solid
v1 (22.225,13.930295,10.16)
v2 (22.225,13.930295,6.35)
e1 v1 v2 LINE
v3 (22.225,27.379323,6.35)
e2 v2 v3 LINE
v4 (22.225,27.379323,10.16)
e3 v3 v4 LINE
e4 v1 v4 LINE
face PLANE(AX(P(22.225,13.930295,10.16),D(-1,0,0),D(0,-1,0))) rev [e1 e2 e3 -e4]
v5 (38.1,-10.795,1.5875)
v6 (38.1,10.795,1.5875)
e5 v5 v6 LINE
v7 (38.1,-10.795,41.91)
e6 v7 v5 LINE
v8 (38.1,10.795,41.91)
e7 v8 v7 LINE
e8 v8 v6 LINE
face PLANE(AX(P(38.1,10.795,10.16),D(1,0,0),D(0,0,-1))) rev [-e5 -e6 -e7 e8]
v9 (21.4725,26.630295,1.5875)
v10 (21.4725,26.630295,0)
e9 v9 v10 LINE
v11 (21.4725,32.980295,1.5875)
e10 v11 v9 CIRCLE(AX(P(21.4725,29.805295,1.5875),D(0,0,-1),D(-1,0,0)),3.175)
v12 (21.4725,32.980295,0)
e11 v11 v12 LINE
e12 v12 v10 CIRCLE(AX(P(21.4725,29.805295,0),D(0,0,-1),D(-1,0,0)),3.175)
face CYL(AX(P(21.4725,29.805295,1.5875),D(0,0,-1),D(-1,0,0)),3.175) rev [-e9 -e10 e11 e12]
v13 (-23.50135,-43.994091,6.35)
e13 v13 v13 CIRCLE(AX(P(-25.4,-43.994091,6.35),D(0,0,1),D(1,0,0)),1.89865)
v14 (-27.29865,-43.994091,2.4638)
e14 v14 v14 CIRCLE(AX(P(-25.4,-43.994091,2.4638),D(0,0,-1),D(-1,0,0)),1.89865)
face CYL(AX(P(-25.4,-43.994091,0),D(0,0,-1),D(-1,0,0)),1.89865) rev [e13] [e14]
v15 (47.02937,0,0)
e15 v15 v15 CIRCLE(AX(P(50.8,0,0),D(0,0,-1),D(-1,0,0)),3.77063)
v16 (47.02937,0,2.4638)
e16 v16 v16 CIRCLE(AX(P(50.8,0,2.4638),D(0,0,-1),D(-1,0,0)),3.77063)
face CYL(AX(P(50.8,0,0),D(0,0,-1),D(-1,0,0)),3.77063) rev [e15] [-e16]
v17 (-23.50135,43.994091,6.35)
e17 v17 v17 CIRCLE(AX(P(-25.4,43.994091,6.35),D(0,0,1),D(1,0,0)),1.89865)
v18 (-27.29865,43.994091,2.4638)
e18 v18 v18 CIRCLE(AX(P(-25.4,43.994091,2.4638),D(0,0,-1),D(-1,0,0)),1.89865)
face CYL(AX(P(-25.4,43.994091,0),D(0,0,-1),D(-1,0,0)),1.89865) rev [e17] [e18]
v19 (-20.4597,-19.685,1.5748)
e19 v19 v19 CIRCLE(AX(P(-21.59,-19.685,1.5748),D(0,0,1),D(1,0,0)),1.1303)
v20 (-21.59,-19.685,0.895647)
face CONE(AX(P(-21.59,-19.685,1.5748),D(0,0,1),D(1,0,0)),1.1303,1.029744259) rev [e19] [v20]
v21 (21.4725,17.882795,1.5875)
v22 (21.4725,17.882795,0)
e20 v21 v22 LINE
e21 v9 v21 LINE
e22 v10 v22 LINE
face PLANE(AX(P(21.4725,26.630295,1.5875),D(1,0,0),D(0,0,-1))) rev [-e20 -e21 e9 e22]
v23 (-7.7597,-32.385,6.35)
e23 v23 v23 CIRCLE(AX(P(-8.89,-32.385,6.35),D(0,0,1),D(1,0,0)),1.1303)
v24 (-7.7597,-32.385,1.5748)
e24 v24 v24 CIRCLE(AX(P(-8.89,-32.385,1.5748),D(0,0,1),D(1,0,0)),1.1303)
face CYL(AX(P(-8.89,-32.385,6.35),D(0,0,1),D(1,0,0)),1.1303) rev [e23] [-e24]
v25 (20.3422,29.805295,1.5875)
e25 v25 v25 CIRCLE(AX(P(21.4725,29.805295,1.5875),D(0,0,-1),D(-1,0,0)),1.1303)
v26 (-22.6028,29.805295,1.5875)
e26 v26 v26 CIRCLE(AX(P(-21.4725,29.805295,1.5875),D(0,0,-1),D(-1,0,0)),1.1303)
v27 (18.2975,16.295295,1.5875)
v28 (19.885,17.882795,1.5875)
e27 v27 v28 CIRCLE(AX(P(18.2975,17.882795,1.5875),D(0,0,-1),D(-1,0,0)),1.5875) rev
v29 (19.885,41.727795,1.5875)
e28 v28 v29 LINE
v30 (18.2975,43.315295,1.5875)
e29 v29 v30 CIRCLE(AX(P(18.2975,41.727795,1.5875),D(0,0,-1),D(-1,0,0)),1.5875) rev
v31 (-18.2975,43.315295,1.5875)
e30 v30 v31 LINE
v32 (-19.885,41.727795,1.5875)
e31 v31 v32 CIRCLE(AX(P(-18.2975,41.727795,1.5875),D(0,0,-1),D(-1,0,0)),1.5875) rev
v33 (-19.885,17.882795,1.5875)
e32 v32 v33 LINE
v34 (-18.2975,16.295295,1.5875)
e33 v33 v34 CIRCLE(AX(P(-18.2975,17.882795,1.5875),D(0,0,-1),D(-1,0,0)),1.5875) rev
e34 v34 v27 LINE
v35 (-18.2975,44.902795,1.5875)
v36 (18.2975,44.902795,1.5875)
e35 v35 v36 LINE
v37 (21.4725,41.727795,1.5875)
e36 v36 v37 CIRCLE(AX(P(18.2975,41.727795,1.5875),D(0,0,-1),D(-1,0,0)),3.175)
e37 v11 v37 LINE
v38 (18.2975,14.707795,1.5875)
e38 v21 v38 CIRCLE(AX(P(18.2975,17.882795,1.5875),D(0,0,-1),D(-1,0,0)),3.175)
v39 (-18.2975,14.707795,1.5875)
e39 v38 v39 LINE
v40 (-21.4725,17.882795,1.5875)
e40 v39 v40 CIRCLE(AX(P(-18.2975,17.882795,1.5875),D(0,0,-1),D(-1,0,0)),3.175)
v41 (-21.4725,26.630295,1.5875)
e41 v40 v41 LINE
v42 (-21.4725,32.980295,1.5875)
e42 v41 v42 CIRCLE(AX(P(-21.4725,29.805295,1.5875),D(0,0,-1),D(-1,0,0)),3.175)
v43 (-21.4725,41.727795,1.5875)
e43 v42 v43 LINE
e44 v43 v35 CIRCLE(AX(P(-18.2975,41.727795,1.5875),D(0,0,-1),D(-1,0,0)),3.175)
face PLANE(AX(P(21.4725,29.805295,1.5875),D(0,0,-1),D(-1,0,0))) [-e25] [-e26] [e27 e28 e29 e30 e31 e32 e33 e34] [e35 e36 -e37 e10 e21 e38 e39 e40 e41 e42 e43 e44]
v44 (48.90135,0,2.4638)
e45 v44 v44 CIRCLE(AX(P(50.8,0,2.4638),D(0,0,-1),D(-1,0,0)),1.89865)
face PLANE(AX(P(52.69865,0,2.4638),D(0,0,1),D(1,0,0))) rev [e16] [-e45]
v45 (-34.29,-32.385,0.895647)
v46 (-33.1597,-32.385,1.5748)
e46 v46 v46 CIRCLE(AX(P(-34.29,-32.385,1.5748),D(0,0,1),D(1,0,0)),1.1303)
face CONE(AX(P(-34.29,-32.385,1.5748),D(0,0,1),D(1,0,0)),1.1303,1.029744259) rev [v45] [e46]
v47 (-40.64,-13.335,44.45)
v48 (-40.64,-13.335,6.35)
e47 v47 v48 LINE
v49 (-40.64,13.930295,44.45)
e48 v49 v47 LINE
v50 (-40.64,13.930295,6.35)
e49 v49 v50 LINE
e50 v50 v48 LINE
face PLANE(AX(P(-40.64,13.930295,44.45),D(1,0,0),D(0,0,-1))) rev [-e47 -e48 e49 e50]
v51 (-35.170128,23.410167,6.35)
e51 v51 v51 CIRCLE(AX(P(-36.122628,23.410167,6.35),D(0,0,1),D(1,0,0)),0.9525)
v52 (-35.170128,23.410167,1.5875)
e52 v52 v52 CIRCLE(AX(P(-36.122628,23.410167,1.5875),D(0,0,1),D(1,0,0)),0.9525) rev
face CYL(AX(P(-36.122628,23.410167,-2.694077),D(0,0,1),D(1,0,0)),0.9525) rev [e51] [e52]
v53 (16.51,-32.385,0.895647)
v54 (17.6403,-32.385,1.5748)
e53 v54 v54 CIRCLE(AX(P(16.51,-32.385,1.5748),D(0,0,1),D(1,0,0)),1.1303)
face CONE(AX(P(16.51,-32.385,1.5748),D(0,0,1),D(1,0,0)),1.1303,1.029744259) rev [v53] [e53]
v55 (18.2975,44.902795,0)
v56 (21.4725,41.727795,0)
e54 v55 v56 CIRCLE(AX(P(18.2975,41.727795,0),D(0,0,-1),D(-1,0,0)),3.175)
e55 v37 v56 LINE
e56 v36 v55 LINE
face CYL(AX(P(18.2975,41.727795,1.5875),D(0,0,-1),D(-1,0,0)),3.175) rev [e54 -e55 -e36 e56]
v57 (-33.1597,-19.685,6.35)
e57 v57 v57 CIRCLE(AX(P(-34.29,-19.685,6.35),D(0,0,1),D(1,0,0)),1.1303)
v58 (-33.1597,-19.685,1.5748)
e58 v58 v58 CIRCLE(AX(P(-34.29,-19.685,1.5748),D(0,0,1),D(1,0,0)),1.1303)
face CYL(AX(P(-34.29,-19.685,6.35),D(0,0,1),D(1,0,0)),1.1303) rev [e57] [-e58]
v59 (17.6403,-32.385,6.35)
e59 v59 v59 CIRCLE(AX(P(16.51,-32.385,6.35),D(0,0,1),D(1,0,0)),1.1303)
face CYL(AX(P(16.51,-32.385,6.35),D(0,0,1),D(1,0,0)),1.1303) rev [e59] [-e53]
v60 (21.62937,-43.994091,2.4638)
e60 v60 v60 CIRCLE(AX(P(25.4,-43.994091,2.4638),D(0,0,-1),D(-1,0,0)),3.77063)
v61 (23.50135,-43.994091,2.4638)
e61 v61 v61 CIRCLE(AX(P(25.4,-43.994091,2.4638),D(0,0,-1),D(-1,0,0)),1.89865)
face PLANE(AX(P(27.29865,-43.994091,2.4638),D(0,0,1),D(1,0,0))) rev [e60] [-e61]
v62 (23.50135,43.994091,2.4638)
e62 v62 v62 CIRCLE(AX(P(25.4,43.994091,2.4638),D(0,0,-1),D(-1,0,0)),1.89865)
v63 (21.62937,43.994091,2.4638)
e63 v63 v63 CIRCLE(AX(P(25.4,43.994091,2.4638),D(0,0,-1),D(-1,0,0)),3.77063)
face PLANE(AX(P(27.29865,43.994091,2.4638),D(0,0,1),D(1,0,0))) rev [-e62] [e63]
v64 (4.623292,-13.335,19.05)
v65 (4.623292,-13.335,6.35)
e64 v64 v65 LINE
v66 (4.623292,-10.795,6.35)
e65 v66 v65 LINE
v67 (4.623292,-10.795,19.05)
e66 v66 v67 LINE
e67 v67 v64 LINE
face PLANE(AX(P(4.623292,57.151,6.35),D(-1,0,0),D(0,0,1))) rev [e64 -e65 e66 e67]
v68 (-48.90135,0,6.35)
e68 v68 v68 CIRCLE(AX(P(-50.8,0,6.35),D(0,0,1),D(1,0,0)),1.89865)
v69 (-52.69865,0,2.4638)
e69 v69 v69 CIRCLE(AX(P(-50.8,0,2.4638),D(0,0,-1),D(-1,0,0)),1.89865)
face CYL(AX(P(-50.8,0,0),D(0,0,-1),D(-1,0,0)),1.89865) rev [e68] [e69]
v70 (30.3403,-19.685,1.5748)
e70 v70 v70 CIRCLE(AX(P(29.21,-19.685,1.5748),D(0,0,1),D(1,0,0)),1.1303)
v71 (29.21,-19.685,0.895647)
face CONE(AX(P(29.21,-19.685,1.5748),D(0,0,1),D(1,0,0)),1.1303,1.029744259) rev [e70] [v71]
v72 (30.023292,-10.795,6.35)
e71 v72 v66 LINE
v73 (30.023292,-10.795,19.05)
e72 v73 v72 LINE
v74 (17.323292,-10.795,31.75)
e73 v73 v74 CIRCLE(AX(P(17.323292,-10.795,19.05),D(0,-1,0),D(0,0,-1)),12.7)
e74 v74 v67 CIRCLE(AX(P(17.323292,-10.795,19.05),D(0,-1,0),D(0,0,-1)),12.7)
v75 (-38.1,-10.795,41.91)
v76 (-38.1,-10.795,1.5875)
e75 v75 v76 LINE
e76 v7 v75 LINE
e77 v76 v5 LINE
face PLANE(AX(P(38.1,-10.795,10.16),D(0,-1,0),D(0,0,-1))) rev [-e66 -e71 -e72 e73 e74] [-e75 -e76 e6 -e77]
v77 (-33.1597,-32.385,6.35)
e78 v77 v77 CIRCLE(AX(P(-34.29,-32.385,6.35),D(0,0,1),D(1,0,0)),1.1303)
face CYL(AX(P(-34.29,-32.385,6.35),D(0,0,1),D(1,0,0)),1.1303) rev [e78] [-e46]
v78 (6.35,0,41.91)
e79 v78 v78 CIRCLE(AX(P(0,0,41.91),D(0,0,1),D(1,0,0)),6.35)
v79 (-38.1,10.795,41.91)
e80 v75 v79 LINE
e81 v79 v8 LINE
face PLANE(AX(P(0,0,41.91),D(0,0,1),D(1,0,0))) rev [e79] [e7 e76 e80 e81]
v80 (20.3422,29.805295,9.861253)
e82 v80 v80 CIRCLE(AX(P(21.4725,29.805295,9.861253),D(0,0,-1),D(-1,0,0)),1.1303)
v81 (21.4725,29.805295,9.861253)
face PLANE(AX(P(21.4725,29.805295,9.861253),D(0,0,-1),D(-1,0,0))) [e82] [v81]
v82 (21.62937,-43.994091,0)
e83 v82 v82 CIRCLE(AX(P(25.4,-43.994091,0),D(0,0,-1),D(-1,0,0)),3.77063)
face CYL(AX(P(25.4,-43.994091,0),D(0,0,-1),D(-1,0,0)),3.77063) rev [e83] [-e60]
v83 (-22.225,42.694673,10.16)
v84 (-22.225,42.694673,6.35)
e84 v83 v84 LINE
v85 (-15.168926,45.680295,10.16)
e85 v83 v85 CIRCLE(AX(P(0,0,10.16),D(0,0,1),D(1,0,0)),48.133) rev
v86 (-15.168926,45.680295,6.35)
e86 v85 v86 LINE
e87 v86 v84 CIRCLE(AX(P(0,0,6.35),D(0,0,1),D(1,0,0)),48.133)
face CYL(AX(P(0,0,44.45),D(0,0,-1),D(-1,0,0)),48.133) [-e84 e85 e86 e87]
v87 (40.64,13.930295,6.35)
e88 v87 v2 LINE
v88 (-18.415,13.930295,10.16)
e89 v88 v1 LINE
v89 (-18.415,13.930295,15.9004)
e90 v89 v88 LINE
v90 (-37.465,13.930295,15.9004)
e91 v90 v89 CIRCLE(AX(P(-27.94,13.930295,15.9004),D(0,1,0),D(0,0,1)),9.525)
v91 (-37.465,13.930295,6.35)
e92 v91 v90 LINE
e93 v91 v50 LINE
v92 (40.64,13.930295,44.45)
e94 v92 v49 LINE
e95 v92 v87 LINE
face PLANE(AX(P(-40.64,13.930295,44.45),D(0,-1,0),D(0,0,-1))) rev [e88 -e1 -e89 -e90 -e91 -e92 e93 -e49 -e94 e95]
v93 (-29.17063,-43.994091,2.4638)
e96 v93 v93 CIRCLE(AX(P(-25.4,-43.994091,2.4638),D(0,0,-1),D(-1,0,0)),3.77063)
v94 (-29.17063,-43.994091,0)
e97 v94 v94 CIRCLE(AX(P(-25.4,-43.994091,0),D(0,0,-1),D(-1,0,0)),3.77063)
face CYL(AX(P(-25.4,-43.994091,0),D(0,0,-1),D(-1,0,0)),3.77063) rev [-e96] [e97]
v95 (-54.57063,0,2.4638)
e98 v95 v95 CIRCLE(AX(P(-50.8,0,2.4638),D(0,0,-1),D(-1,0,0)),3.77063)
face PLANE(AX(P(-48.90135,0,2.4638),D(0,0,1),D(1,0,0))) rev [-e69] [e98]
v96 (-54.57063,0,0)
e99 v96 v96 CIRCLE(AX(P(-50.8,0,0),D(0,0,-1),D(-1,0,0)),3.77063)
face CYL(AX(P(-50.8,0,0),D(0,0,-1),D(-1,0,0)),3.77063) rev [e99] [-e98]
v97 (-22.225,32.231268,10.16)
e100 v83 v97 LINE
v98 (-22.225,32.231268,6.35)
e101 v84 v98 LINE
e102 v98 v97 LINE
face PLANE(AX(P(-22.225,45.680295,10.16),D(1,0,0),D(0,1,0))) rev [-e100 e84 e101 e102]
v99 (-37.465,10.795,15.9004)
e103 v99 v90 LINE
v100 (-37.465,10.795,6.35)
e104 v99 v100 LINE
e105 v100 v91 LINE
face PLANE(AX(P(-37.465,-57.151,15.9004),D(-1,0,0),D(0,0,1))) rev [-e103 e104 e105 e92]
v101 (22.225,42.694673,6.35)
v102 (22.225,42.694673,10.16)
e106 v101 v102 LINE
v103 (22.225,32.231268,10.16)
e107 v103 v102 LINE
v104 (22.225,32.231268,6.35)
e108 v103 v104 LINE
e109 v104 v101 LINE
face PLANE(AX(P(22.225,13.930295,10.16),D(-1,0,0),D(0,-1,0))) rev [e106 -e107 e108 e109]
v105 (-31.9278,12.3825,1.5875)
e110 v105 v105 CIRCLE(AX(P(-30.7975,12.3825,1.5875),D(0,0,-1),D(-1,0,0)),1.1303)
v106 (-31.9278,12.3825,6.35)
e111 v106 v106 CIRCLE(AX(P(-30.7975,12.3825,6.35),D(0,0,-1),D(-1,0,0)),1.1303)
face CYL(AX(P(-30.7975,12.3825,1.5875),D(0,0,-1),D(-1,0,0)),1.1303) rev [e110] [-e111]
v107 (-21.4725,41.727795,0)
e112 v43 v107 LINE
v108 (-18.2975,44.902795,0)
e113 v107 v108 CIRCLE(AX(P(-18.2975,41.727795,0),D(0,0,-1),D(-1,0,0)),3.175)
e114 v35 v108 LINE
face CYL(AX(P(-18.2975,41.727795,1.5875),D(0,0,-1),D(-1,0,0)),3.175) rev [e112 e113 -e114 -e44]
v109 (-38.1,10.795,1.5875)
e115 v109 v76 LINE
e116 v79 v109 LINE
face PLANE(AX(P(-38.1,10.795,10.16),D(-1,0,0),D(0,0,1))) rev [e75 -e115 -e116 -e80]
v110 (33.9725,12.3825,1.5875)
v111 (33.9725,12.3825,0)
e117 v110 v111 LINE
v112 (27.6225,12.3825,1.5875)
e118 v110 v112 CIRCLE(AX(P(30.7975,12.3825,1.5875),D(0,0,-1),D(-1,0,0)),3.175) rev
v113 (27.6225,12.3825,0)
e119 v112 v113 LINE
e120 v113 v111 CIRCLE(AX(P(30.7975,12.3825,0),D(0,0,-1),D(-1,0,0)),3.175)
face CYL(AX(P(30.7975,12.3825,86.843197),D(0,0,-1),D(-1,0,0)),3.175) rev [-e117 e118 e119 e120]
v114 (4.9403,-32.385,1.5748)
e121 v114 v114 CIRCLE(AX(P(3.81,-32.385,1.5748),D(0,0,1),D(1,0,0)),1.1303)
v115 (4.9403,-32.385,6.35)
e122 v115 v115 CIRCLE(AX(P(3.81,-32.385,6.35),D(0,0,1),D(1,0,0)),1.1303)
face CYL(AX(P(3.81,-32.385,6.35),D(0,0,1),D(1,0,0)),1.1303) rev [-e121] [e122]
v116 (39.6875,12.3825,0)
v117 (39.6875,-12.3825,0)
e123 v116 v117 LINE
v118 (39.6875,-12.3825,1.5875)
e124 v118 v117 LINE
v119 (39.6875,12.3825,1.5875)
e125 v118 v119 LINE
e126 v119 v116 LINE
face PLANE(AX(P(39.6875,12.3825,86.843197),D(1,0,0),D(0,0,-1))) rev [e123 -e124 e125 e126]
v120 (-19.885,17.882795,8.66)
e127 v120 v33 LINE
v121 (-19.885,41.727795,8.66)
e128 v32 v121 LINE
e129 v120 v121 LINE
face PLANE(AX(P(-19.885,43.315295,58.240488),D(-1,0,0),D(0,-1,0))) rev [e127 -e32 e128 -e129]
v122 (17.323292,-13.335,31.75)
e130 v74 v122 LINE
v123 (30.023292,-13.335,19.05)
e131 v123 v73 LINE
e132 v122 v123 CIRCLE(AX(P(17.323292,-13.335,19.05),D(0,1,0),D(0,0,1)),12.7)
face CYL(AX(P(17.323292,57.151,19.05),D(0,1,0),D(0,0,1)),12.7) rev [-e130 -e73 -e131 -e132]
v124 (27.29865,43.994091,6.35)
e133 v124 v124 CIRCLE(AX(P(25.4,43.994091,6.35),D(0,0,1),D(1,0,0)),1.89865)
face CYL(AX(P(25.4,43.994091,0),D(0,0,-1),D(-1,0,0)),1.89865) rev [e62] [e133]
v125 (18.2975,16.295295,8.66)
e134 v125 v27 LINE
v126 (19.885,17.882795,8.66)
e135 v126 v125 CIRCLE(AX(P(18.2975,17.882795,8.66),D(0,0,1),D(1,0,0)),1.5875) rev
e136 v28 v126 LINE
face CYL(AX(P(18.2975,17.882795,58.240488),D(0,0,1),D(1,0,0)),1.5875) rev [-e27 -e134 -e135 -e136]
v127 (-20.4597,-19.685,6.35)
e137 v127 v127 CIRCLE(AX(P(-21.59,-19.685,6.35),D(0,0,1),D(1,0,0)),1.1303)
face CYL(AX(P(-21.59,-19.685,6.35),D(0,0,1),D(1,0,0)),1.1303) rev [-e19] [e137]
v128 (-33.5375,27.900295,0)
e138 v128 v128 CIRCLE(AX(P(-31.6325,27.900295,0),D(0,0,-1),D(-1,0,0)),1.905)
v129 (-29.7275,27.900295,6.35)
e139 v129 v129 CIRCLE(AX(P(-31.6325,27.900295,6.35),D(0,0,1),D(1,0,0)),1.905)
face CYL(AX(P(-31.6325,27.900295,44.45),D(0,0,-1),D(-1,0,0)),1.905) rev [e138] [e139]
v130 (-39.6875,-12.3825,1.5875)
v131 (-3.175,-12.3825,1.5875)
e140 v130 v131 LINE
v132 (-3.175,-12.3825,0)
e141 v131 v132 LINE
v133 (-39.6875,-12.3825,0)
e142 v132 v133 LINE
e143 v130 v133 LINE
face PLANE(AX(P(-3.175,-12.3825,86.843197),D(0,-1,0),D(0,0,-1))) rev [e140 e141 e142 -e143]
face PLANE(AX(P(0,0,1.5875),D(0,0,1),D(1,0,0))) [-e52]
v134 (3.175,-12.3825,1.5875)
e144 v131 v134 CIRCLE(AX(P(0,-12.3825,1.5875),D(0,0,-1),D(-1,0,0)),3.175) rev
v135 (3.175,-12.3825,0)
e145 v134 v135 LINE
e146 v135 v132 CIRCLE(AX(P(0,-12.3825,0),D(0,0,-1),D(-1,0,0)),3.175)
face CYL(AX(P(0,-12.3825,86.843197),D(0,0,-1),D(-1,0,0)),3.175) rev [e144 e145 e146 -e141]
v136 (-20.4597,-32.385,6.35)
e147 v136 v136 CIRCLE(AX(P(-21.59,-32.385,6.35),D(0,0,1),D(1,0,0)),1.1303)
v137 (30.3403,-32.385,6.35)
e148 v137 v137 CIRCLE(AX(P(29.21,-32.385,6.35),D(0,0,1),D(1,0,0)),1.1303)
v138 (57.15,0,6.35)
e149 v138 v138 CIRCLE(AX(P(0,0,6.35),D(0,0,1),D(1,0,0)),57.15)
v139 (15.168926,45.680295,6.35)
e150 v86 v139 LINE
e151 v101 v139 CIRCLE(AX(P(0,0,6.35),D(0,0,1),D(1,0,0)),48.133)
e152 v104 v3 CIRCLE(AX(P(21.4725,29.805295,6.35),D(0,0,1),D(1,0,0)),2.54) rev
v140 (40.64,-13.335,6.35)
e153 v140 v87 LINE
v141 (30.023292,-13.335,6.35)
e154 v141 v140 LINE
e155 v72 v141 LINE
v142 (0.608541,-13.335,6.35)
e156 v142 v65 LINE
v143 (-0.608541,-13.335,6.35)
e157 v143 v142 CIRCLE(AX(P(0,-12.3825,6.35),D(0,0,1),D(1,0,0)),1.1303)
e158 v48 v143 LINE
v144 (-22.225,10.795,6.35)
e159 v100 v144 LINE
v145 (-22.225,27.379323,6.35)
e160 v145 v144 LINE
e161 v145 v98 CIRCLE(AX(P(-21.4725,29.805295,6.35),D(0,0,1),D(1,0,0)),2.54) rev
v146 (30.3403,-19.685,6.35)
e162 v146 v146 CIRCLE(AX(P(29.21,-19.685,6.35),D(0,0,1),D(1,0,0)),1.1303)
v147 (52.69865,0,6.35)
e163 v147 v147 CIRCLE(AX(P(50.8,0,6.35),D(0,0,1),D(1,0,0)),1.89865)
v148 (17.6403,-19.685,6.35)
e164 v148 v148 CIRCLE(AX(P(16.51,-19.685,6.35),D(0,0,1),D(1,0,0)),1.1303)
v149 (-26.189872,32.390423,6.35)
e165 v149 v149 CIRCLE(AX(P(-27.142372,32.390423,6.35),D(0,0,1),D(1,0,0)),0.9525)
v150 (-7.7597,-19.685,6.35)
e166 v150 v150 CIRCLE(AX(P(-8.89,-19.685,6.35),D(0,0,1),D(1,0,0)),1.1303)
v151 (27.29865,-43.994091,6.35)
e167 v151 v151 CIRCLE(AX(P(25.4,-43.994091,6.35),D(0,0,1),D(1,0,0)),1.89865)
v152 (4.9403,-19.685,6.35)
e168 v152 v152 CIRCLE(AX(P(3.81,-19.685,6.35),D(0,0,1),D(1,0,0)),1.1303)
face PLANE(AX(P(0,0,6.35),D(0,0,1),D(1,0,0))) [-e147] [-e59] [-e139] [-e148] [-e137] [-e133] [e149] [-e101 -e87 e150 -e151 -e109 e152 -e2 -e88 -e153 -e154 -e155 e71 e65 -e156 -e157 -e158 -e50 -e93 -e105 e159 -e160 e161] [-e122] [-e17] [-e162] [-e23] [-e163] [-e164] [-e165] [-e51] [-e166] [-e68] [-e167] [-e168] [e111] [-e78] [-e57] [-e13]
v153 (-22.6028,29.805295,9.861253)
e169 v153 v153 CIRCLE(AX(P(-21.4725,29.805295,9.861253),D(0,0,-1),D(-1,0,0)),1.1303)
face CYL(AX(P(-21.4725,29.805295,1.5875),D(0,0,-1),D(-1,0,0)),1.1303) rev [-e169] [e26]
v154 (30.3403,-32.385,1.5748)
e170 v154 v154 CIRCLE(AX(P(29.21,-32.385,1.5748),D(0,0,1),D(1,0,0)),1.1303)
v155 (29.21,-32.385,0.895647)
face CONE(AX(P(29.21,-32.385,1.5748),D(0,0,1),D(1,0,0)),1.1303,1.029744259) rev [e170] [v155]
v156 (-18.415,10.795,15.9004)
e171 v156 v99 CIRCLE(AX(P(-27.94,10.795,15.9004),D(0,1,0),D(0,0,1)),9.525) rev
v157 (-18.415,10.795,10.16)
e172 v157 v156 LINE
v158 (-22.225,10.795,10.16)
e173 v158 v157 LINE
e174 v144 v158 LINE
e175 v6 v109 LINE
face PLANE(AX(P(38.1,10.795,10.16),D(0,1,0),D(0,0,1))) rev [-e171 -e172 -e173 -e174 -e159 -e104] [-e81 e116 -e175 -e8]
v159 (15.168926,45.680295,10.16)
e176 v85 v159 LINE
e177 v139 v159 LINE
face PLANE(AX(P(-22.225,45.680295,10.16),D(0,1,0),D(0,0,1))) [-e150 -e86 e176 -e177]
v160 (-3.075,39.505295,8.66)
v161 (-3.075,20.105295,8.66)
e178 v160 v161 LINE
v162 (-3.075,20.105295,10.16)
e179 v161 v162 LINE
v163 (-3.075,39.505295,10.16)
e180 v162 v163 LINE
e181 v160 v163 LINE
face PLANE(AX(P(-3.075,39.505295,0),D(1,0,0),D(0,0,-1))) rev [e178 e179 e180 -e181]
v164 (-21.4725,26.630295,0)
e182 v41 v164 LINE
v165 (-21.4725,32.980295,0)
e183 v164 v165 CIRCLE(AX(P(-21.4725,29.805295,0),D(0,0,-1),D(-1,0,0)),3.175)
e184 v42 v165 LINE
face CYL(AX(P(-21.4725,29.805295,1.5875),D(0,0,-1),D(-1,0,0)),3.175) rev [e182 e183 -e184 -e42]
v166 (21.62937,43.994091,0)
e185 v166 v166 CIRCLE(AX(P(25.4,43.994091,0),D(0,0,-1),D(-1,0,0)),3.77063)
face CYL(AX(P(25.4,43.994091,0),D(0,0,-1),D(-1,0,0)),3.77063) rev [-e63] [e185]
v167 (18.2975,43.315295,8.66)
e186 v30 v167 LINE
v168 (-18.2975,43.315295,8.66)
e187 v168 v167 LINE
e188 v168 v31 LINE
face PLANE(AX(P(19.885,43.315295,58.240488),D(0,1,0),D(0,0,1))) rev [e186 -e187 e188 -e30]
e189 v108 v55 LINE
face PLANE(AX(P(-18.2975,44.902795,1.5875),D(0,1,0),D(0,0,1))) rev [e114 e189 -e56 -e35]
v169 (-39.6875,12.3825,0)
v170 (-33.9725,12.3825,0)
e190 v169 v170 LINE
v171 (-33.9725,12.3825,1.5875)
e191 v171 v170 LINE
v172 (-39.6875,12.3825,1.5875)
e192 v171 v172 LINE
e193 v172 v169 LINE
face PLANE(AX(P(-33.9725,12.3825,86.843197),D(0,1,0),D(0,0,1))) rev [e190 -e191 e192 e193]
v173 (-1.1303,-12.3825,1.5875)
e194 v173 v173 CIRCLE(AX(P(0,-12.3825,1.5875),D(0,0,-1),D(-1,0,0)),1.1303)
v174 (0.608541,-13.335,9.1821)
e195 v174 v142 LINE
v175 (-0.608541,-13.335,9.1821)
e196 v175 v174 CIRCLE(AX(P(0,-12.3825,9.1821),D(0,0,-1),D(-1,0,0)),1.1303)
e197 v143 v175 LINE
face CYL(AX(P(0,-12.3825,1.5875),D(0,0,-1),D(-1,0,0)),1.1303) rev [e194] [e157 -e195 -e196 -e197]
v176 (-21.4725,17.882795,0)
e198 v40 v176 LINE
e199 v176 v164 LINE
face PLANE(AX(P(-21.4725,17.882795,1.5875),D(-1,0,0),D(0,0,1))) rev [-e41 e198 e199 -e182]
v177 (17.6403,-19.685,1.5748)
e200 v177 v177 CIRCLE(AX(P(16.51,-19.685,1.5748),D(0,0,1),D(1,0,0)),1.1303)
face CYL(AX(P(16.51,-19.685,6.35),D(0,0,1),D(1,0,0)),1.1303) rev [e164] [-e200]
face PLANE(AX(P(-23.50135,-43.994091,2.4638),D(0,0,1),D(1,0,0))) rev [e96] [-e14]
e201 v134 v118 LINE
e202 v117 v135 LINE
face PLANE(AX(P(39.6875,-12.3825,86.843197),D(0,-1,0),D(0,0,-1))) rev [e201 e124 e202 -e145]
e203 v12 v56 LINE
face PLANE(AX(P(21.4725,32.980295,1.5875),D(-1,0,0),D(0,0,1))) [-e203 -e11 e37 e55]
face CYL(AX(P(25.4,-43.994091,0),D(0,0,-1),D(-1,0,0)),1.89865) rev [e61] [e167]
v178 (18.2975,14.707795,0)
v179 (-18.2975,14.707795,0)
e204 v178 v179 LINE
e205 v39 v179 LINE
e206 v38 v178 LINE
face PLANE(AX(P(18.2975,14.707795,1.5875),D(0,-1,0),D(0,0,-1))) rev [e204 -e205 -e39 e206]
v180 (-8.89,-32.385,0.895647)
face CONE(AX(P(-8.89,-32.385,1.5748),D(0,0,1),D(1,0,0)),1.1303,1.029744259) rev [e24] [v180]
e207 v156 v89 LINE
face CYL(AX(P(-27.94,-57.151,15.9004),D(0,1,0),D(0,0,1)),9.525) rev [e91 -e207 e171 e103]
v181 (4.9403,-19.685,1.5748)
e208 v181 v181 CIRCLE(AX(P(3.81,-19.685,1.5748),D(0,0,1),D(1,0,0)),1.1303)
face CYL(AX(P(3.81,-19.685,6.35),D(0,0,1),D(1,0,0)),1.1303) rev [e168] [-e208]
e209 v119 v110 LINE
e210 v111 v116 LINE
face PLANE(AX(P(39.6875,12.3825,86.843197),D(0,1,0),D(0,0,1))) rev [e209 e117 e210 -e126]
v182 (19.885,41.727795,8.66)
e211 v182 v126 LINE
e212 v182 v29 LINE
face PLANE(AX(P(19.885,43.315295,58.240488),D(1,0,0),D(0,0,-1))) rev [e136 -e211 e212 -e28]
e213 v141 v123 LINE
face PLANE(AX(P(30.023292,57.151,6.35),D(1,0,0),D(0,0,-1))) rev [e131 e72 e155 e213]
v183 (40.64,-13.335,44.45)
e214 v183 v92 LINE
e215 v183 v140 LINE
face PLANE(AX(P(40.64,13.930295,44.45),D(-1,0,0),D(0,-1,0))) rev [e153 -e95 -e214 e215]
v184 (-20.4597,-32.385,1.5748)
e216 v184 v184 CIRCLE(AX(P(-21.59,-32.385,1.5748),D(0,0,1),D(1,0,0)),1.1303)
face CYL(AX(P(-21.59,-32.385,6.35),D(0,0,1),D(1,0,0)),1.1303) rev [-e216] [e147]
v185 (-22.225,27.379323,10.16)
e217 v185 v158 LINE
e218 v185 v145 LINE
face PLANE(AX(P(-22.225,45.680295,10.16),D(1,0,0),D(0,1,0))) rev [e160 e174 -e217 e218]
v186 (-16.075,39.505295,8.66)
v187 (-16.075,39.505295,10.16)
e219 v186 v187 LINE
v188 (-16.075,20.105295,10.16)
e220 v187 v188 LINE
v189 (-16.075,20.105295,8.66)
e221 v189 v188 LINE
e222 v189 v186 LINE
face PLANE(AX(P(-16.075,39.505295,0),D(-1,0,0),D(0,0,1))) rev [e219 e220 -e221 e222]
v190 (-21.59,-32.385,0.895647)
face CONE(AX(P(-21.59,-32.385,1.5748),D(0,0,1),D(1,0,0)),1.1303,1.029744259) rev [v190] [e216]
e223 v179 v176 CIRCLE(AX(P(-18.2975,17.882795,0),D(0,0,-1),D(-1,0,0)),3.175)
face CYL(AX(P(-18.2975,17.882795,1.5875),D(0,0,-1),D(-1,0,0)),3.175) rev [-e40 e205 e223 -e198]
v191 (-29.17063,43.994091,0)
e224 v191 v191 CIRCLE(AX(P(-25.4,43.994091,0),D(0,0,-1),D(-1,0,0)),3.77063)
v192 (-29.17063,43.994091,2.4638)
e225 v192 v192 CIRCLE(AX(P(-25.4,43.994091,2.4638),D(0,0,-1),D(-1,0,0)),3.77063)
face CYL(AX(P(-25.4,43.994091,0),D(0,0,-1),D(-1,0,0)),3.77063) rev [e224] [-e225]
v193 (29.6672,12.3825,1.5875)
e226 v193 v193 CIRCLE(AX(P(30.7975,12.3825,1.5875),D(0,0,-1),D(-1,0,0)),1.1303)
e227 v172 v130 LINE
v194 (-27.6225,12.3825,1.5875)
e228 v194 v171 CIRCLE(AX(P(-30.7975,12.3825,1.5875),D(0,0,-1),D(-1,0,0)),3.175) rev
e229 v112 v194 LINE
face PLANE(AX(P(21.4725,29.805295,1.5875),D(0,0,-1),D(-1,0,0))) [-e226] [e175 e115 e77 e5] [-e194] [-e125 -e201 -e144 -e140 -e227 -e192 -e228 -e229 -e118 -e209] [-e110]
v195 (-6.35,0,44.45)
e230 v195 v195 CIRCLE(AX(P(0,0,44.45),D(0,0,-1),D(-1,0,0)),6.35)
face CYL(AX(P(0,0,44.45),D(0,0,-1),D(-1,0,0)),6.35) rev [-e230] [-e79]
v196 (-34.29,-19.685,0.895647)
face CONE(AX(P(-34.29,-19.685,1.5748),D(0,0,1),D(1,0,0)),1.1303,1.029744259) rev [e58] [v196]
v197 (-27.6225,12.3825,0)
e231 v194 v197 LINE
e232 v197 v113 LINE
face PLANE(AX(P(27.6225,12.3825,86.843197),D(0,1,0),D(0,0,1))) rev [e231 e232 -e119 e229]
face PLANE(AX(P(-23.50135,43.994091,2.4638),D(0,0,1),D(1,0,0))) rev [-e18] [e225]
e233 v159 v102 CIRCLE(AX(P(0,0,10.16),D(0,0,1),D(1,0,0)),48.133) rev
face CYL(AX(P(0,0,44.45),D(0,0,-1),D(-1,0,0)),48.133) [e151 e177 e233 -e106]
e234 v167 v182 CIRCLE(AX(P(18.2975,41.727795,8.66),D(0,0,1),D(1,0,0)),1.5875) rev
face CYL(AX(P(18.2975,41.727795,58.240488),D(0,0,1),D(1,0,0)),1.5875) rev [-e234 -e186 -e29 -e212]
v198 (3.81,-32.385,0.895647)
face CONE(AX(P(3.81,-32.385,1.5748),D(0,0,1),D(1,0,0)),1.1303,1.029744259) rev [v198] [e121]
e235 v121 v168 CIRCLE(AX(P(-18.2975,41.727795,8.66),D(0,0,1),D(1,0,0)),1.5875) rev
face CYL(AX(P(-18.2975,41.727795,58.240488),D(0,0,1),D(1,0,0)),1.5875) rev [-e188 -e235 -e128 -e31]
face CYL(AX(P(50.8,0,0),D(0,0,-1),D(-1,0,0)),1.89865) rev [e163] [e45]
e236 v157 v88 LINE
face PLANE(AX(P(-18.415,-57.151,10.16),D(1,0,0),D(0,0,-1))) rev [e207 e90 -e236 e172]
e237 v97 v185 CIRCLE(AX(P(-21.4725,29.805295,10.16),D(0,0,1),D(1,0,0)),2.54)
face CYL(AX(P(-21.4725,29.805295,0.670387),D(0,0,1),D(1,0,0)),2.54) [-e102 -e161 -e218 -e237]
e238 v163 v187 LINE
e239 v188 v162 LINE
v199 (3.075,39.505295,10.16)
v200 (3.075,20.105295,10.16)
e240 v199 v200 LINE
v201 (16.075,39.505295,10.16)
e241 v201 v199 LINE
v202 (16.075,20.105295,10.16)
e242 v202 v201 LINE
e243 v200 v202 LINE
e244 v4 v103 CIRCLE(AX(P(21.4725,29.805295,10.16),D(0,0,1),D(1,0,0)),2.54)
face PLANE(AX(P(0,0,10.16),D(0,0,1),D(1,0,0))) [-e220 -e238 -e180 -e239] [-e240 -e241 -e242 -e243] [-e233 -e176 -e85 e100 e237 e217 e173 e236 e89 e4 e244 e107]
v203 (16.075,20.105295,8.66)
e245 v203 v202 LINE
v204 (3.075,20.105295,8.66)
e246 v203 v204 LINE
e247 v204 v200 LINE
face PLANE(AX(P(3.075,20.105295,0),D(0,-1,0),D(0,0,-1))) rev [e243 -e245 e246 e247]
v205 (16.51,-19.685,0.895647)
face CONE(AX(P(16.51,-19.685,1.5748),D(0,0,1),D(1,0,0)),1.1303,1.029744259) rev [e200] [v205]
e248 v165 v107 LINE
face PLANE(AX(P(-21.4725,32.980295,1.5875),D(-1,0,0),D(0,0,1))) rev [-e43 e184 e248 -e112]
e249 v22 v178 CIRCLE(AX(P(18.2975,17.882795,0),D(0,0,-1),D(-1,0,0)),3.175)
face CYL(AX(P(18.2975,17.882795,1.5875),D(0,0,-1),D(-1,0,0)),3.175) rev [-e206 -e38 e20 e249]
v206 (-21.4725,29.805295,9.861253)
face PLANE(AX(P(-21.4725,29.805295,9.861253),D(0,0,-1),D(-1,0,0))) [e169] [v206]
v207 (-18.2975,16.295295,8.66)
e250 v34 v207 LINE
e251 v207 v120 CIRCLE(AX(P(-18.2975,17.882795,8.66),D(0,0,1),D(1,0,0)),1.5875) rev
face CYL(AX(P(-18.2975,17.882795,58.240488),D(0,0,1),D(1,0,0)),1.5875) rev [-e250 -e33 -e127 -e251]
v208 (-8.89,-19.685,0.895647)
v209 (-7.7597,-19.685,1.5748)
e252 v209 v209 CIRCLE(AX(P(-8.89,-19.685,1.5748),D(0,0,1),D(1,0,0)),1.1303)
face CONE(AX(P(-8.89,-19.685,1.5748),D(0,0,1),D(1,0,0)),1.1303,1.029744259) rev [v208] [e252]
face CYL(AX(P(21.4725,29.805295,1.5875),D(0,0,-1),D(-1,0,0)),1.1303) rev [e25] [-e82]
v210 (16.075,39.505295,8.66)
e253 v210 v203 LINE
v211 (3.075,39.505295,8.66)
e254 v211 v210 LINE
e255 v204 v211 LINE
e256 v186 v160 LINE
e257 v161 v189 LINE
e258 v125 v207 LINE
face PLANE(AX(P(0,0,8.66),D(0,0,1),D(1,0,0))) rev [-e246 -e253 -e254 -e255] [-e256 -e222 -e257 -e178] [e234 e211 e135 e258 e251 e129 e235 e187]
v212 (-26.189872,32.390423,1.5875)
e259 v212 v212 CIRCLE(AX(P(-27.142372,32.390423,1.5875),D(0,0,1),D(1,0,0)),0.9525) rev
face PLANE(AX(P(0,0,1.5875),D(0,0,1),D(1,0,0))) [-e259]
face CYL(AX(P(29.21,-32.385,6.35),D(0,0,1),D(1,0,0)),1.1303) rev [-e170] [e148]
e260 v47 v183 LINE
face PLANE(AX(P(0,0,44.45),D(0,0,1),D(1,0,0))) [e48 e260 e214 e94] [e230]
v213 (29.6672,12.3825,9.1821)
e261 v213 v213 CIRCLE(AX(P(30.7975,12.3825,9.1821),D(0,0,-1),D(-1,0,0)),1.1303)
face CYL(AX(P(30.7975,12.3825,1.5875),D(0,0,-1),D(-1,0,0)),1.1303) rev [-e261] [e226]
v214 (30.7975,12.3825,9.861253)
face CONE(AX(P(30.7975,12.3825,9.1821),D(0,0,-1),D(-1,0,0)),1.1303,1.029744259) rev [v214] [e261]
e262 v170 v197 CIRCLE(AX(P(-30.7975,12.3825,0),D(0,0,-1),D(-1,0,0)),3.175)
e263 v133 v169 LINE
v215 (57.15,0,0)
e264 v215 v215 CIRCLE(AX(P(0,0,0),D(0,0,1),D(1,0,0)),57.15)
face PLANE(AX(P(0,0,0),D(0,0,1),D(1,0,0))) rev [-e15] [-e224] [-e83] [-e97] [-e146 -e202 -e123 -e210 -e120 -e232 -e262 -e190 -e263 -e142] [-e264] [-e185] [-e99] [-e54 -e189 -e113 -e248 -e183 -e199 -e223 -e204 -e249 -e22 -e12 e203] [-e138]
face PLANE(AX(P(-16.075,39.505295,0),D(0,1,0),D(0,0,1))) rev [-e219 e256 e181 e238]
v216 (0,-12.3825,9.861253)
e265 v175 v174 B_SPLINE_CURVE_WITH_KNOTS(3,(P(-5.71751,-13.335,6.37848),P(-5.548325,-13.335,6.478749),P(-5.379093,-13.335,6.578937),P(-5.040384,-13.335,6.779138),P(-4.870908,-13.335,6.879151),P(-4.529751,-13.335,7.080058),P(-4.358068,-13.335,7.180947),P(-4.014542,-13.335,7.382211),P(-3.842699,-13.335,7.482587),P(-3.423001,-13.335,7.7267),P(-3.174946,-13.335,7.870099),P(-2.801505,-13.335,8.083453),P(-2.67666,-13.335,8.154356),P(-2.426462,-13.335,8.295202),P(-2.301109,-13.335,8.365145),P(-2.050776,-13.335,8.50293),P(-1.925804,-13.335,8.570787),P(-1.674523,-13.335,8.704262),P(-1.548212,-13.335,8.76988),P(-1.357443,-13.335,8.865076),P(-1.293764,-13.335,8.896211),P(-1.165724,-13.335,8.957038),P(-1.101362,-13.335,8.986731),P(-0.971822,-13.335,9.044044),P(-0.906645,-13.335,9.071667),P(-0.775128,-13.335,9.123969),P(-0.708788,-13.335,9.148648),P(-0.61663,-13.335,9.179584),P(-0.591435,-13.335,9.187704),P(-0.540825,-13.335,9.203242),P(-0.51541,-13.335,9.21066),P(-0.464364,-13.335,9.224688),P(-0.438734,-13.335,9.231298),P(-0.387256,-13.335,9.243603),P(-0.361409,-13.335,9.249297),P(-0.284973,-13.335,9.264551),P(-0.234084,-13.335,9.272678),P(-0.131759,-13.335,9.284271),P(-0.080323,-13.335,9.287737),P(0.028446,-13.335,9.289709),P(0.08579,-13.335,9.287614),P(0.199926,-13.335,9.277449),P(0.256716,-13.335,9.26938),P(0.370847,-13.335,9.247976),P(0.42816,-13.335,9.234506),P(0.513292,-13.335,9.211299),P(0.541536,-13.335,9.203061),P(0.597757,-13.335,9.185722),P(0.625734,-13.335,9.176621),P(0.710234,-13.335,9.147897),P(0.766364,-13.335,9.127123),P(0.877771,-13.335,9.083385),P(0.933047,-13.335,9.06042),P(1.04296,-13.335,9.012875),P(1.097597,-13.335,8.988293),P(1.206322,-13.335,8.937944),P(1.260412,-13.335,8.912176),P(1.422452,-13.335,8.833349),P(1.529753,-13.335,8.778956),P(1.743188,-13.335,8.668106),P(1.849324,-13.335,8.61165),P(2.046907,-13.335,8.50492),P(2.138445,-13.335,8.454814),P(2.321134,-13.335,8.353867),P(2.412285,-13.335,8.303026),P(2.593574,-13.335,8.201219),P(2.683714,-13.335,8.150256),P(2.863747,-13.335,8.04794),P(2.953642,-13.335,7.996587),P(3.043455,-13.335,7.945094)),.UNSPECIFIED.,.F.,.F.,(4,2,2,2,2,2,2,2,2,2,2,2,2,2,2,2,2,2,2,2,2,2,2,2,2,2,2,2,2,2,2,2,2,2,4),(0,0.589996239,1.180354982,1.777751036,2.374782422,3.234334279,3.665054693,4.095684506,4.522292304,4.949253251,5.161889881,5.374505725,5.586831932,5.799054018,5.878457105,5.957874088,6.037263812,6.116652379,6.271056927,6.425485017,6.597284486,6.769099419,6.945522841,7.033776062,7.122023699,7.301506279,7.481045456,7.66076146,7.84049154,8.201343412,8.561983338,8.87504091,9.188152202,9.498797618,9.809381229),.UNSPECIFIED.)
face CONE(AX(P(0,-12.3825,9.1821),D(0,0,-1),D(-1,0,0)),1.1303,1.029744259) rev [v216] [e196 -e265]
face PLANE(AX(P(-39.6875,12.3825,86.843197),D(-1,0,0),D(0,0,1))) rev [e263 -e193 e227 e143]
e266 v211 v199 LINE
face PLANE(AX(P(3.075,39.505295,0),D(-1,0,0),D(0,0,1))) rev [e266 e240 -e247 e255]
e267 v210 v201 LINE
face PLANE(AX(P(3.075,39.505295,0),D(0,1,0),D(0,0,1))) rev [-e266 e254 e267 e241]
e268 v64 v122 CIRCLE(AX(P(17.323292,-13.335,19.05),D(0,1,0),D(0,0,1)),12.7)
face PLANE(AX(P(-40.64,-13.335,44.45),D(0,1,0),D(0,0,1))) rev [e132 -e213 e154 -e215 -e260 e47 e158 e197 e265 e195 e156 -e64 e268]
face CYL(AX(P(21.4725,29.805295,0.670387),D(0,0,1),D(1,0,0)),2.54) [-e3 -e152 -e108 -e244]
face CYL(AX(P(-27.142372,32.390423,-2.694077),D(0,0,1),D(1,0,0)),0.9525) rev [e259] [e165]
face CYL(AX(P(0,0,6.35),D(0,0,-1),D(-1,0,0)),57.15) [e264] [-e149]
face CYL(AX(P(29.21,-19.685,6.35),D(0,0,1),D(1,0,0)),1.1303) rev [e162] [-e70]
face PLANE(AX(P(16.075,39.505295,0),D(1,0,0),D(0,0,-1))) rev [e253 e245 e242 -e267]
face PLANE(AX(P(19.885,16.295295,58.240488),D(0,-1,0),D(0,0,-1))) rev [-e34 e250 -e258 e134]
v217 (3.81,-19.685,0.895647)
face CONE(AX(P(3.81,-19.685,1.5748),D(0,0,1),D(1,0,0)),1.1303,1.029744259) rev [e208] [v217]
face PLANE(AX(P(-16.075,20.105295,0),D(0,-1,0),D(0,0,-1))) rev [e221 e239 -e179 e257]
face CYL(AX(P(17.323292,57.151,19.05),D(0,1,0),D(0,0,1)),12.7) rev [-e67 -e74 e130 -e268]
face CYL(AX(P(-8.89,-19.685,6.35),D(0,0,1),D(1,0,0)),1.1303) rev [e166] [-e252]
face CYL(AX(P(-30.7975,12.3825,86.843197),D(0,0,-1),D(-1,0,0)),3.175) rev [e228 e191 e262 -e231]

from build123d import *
from build123d.topology import SkipClean

# Parameters (mm, degrees)
SKETCH1_R                                       = 57.15
BOSS_EXTRUDE1_DEPTH                             = 6.35
SKETCH2_W                                       = 44.45
SKETCH2_H                                       = 31.75
BOSS_EXTRUDE2_DEPTH                             = 3.81
SKETCH3_W                                       = 13
SKETCH3_H                                       = 19.4
CUT_EXTRUDE1_DEPTH                              = 82.458397971
SKETCH4_W                                       = 39.77
SKETCH4_H                                       = 27.02
CUT_EXTRUDE2_DEPTH                              = 8.66
FILLET1_R                                       = 1.5875
CUT_EXTRUDE3_DEPTH                              = 1.5875
CBORE_FOR_6_PAN_HEAD_MACHINE_SCREW1_D           = 3.7973
CBORE_FOR_6_PAN_HEAD_MACHINE_SCREW1_CBORE_D     = 7.54126
CBORE_FOR_6_PAN_HEAD_MACHINE_SCREW1_CBORE_DEPTH = 2.4638
CIRPATTERN1_COUNT                               = 6
SKETCH11_W                                      = 76.2
SKETCH11_H                                      = 21.59
CUT_EXTRUDE4_DEPTH                              = 82.458397971
CUT_EXTRUDE5_DEPTH                              = 1.5875
SKETCH15_W                                      = 81.28
SKETCH15_H                                      = 27.26529526
SKETCH15_W_2                                    = 76.2
SKETCH15_H_2                                    = 21.59
BOSS_EXTRUDE3_DEPTH                             = 38.1
CUT_EXTRUDE6_REACH                              = 103.045
SKETCH16_W                                      = 25.4
SKETCH16_H                                      = 25.4
FILLET2_R                                       = 12.7
SKETCH17_W                                      = 81.28
SKETCH17_H                                      = 27.26529526
BOSS_EXTRUDE4_DEPTH                             = 2.54
F_4_40_TAPPED_HOLE1_D                           = 2.2606
F_4_40_TAPPED_HOLE1_DEPTH                       = 7.5946
F_4_40_TAPPED_HOLE1_TIP                         = 0.679152758
BOSS_EXTRUDE5_DEPTH                             = 3.81
SKETCH18_R                                      = 1.905
CUT_EXTRUDE7_DEPTH                              = 93.239077944
SKETCH19_R                                      = 0.9525
CUT_EXTRUDE8_DEPTH                              = 4.7625
CUT_EXTRUDE9_REACH                              = 103.461
CUT_EXTRUDE11_START                             = -8.273753
SKETCH23_R                                      = 1.1303
CUT_EXTRUDE11_DEPTH                             = 8.273753
F_4_40_TAPPED_HOLE2_AT_2_COUNT                  = 2
F_4_40_TAPPED_HOLE2_AT_2_PITCH                  = 12.7
LPATTERN1_COUNT                                 = 6
LPATTERN1_PITCH                                 = 12.7
SKETCH26_R                                      = 6.35
CUT_EXTRUDE12_DEPTH                             = 93.239077944
SKETCH27_R                                      = 63.5
SKETCH27_R_2                                    = 48.133
CUT_EXTRUDE14_DEPTH                             = 90.352420225


with BuildPart() as part:
    # Sketch1 → Boss-Extrude1 (new body)
    with BuildSketch(Plane.XY):
        Circle(SKETCH1_R)
    extrude(amount=BOSS_EXTRUDE1_DEPTH)

    # Sketch2 → Boss-Extrude2 (add)
    with BuildSketch(Plane.XY.offset(6.35)):
        with Locations((0, 29.80529526)):
            Rectangle(SKETCH2_W, SKETCH2_H)
    extrude(amount=BOSS_EXTRUDE2_DEPTH)

    # Sketch3 → Cut-Extrude1 (cut, through all)
    with BuildSketch(Plane.XY.offset(10.16)):
        with Locations((-9.575, 29.80529526)):
            Rectangle(SKETCH3_W, SKETCH3_H)
        with Locations((9.575, 29.80529526)):
            Rectangle(SKETCH3_W, SKETCH3_H)
    extrude(amount=-CUT_EXTRUDE1_DEPTH, mode=Mode.SUBTRACT)

    # Sketch4 → Cut-Extrude2 (cut)
    with BuildSketch(Plane(origin=(0, 0, 0), x_dir=(-1, 0, 0), z_dir=(0, 0, -1))):
        with Locations((0, 29.80529526)):
            Rectangle(SKETCH4_W, SKETCH4_H)
    extrude(amount=-CUT_EXTRUDE2_DEPTH, mode=Mode.SUBTRACT)

    # Fillet1
    fillet1_edges = [part.edges().sort_by_distance(p)[0] for p in [
        (-19.885, 16.29529526, 4.33),
        (-19.885, 43.31529526, 4.33),
        (19.885, 43.31529526, 4.33),
        (19.885, 16.29529526, 4.33),
    ]]
    fillet(fillet1_edges, radius=FILLET1_R)

    # Sketch8 → Cut-Extrude3 (cut)
    with BuildSketch(Plane(origin=(0, 0, 0), x_dir=(-1, 0, 0), z_dir=(0, 0, -1))):
        with BuildLine():
            Line((18.2975, 44.90279526), (-18.2975, 44.90279526))
            ThreePointArc((-18.2975, 44.90279526), (-20.54256403, 43.97285929), (-21.4725, 41.72779526))
            Line((-21.4725, 41.72779526), (-21.4725, 32.98029526))
            ThreePointArc((-21.4725, 32.98029526), (-24.6475, 29.80529526), (-21.4725, 26.63029526))
            Line((-21.4725, 26.63029526), (-21.4725, 17.88279526))
            ThreePointArc((-21.4725, 17.88279526), (-20.54256403, 15.637731229), (-18.2975, 14.70779526))
            Line((-18.2975, 14.70779526), (18.2975, 14.70779526))
            ThreePointArc((18.2975, 14.70779526), (20.54256403, 15.637731229), (21.4725, 17.88279526))
            Line((21.4725, 17.88279526), (21.4725, 26.63029526))
            ThreePointArc((21.4725, 26.63029526), (24.6475, 29.80529526), (21.4725, 32.98029526))
            Line((21.4725, 32.98029526), (21.4725, 41.72779526))
            ThreePointArc((21.4725, 41.72779526), (20.54256403, 43.97285929), (18.2975, 44.90279526))
        make_face()
    extrude(amount=-CUT_EXTRUDE3_DEPTH, mode=Mode.SUBTRACT)

    # CBORE for #6 Pan Head Machine Screw1 (through all)
    with Locations(Plane(origin=(0, 0, 0), x_dir=(-1, 0, 0), z_dir=(0, 0, -1))):
        with Locations((-50.8, 0)):
            cbore_for_6_pan_head_machine_screw1 = CounterBoreHole(CBORE_FOR_6_PAN_HEAD_MACHINE_SCREW1_D / 2, CBORE_FOR_6_PAN_HEAD_MACHINE_SCREW1_CBORE_D / 2, CBORE_FOR_6_PAN_HEAD_MACHINE_SCREW1_CBORE_DEPTH)

    # CirPattern1: CBORE for #6 Pan Head Machine Screw1 ×6 about axis
    cirpattern1_axis = Axis((0, 0, 0), (0, 0, 1))
    for i in range(1, CIRPATTERN1_COUNT):
        add(cbore_for_6_pan_head_machine_screw1.rotate(cirpattern1_axis, i * 360 / CIRPATTERN1_COUNT), mode=Mode.SUBTRACT)

    # Sketch11 → Cut-Extrude4 (cut, through all)
    with BuildSketch(Plane(origin=(0, 0, 0), x_dir=(-1, 0, 0), z_dir=(0, 0, -1))):
        Rectangle(SKETCH11_W, SKETCH11_H)
    extrude(amount=-CUT_EXTRUDE4_DEPTH, mode=Mode.SUBTRACT)

    # Sketch12 → Cut-Extrude5 (cut)
    with BuildSketch(Plane(origin=(0, 0, 0), x_dir=(-1, 0, 0), z_dir=(0, 0, -1))):
        with BuildLine():
            Line((-39.6875, 12.3825), (-33.9725, 12.3825))
            ThreePointArc((-33.9725, 12.3825), (-30.7975, 15.5575), (-27.6225, 12.3825))
            Line((-27.6225, 12.3825), (27.6225, 12.3825))
            ThreePointArc((27.6225, 12.3825), (30.7975, 15.5575), (33.9725, 12.3825))
            Line((33.9725, 12.3825), (39.6875, 12.3825))
            Line((39.6875, 12.3825), (39.6875, -12.3825))
            Line((39.6875, -12.3825), (3.175, -12.3825))
            ThreePointArc((3.175, -12.3825), (0, -15.5575), (-3.175, -12.3825))
            Line((-3.175, -12.3825), (-39.6875, -12.3825))
            Line((-39.6875, -12.3825), (-39.6875, 12.3825))
        make_face()
    extrude(amount=-CUT_EXTRUDE5_DEPTH, mode=Mode.SUBTRACT)

    # Sketch15 → Boss-Extrude3 (add)
    with BuildSketch(Plane.XY.offset(6.35)):
        with Locations((0, 0.29764763)):
            Rectangle(SKETCH15_W, SKETCH15_H)
        Rectangle(SKETCH15_W_2, SKETCH15_H_2, mode=Mode.SUBTRACT)
    extrude(amount=BOSS_EXTRUDE3_DEPTH)

    # Sketch16 → Cut-Extrude6 (cut, up to next)
    with BuildSketch(Plane.XZ.offset(13.335), mode=Mode.PRIVATE) as cut_extrude6_sk1:
        with Locations((17.323292084, 19.05)):
            Rectangle(SKETCH16_W, SKETCH16_H)
    cut_extrude6_tool1 = extrude(cut_extrude6_sk1.sketch, amount=-CUT_EXTRUDE6_REACH, mode=Mode.PRIVATE) & part.part
    add(cut_extrude6_tool1.solids().sort_by_distance((17.323292, -13.335, 19.05))[0], mode=Mode.SUBTRACT)

    # Fillet2
    fillet2_edges = [part.edges().sort_by_distance(p)[0] for p in [
        (4.623292084, -12.065, 31.75),
        (30.023292084, -12.065, 31.75),
    ]]
    fillet(fillet2_edges, radius=FILLET2_R - 0.0001)  # a hair under: the kernel refuses the full size

    # Sketch17 → Boss-Extrude4 (add)
    with BuildSketch(Plane.XY.offset(44.45)):
        with Locations((0, 0.29764763)):
            Rectangle(SKETCH17_W, SKETCH17_H)
    extrude(amount=-BOSS_EXTRUDE4_DEPTH)

    # #4-40 Tapped Hole1
    with Locations(Plane(origin=(0, 0, 1.5875), x_dir=(-1, 0, 0), z_dir=(0, 0, -1))):
        with Locations((0, -12.3825), (30.7975, 12.3825), (21.4725, 29.80529526), (-21.4725, 29.80529526), (-30.7975, 12.3825)):
            Hole(F_4_40_TAPPED_HOLE1_D / 2, depth=F_4_40_TAPPED_HOLE1_DEPTH)
            with Locations((0, 0, -(F_4_40_TAPPED_HOLE1_DEPTH + F_4_40_TAPPED_HOLE1_TIP / 2))):  # 118° drill point
                Cone(0, F_4_40_TAPPED_HOLE1_D / 2, F_4_40_TAPPED_HOLE1_TIP, mode=Mode.SUBTRACT)

    # Sketch21 → Boss-Extrude5 (add)
    with SkipClean():  # the faces are left unmerged after this step: merging them gives an invalid solid
        with BuildSketch(Plane.XY.offset(10.16)):
            with BuildLine():
                Line((-21.4725, 32.34529526), (-21.4725, 27.26529526))
                ThreePointArc((-21.4725, 27.26529526), (-24.0125, 29.80529526), (-21.4725, 32.34529526))
            make_face()
            with BuildLine():
                Line((21.4725, 32.34529526), (21.4725, 27.26529526))
                ThreePointArc((21.4725, 27.26529526), (24.0125, 29.80529526), (21.4725, 32.34529526))
            make_face()
        extrude(amount=-BOSS_EXTRUDE5_DEPTH)

    # Sketch18 → Cut-Extrude7 (cut, through all)
    with SkipClean():  # the faces are left unmerged after this step: merging them gives an invalid solid
        with BuildSketch(Plane(origin=(0, 0, 0), x_dir=(-1, 0, 0), z_dir=(0, 0, -1))):
            with Locations((31.6325, 27.90029526)):
                Circle(SKETCH18_R)
        extrude(amount=-CUT_EXTRUDE7_DEPTH, mode=Mode.SUBTRACT)

    # Sketch19 → Cut-Extrude8 (cut)
    with SkipClean():  # the faces are left unmerged after this step: merging them gives an invalid solid
        with BuildSketch(Plane.XY.offset(6.35)):
            with Locations((-36.122628061, 23.410167199)):
                Circle(SKETCH19_R)
            with Locations((-27.142371939, 32.39042332)):
                Circle(SKETCH19_R)
        extrude(amount=-CUT_EXTRUDE8_DEPTH, mode=Mode.SUBTRACT)

    # Sketch20 → Cut-Extrude9 (cut, up to next)
    with BuildSketch(Plane(origin=(0, 13.93029526, 0), x_dir=(1, 0, 0), z_dir=(0, 1, 0)), mode=Mode.PRIVATE) as cut_extrude9_sk1:
        with BuildLine():
            Line((-37.465, -15.9004), (-37.465, -6.35))
            Line((-37.465, -6.35), (-22.225, -6.35))
            Line((-22.225, -6.35), (-22.225, -10.16))
            Line((-22.225, -10.16), (-18.415, -10.16))
            Line((-18.415, -10.16), (-18.415, -15.9004))
            ThreePointArc((-18.415, -15.9004), (-27.94, -25.4254), (-37.465, -15.9004))
        make_face()
    cut_extrude9_tool1 = extrude(cut_extrude9_sk1.sketch, amount=-CUT_EXTRUDE9_REACH, mode=Mode.PRIVATE) & part.part
    add(cut_extrude9_tool1.solids().sort_by_distance((-28.296895, 13.930295, 15.31418))[0], mode=Mode.SUBTRACT)

    # Sketch23 → Cut-Extrude11 (cut)
    with BuildSketch(Plane(origin=(0, 0, 1.5875), x_dir=(-1, 0, 0), z_dir=(0, 0, -1)).offset(CUT_EXTRUDE11_START)):
        with Locations((-21.4725, 29.80529526)):
            Circle(SKETCH23_R)
        with Locations((21.4725, 29.80529526)):
            Circle(SKETCH23_R)
    extrude(amount=CUT_EXTRUDE11_DEPTH, mode=Mode.SUBTRACT)

    # Sketch25 → #4-40 Tapped Hole2 (revolve, cut)
    with BuildSketch(Plane(origin=(-34.29, -19.685, 6.35), x_dir=(0, -1, 0), z_dir=(1, 0, 0))):
        Polygon((0, 0), (0, 5.454352758), (1.1303, 4.7752), (1.1303, 0), align=None)
    f_4_40_tapped_hole2 = revolve(axis=Axis((-34.29, -19.685, 12.7), (0, 0, -1)), mode=Mode.SUBTRACT)

    # #4-40 Tapped Hole2 at 2: #4-40 Tapped Hole2 ×2
    with Locations(*[(0, -i * F_4_40_TAPPED_HOLE2_AT_2_PITCH, 0) for i in range(1, F_4_40_TAPPED_HOLE2_AT_2_COUNT)]):
        add(f_4_40_tapped_hole2, mode=Mode.SUBTRACT)

    # LPattern1: #4-40 Tapped Hole2 ×6
    with Locations(*[(i * LPATTERN1_PITCH, 0, 0) for i in range(1, LPATTERN1_COUNT)]):
        add(f_4_40_tapped_hole2, mode=Mode.SUBTRACT)

    # LPattern1 copy 1 sketch → LPattern1 copy 1 (revolve, cut)
    with BuildSketch(Plane(origin=(-21.59, -32.385, 6.35), x_dir=(0, -1, 0), z_dir=(1, 0, 0))):
        Polygon((0, 0), (0, 5.454352758), (1.1303, 4.7752), (1.1303, 0), align=None)
    revolve(axis=Axis((-21.59, -32.385, 12.7), (0, 0, -1)), mode=Mode.SUBTRACT)

    # LPattern1 copy 2 sketch → LPattern1 copy 2 (revolve, cut)
    with BuildSketch(Plane(origin=(-8.89, -32.385, 6.35), x_dir=(0, -1, 0), z_dir=(1, 0, 0))):
        Polygon((0, 0), (0, 5.454352758), (1.1303, 4.7752), (1.1303, 0), align=None)
    revolve(axis=Axis((-8.89, -32.385, 12.7), (0, 0, -1)), mode=Mode.SUBTRACT)

    # LPattern1 copy 3 sketch → LPattern1 copy 3 (revolve, cut)
    with BuildSketch(Plane(origin=(3.81, -32.385, 6.35), x_dir=(0, -1, 0), z_dir=(1, 0, 0))):
        Polygon((0, 0), (0, 5.454352758), (1.1303, 4.7752), (1.1303, 0), align=None)
    revolve(axis=Axis((3.81, -32.385, 12.7), (0, 0, -1)), mode=Mode.SUBTRACT)

    # LPattern1 copy 4 sketch → LPattern1 copy 4 (revolve, cut)
    with BuildSketch(Plane(origin=(16.51, -32.385, 6.35), x_dir=(0, -1, 0), z_dir=(1, 0, 0))):
        Polygon((0, 0), (0, 5.454352758), (1.1303, 4.7752), (1.1303, 0), align=None)
    revolve(axis=Axis((16.51, -32.385, 12.7), (0, 0, -1)), mode=Mode.SUBTRACT)

    # LPattern1 copy 5 sketch → LPattern1 copy 5 (revolve, cut)
    with BuildSketch(Plane(origin=(29.21, -32.385, 6.35), x_dir=(0, -1, 0), z_dir=(1, 0, 0))):
        Polygon((0, 0), (0, 5.454352758), (1.1303, 4.7752), (1.1303, 0), align=None)
    revolve(axis=Axis((29.21, -32.385, 12.7), (0, 0, -1)), mode=Mode.SUBTRACT)

    # Sketch26 → Cut-Extrude12 (cut, through all)
    with BuildSketch(Plane(origin=(0, 0, 0), x_dir=(-1, 0, 0), z_dir=(0, 0, -1))):
        Circle(SKETCH26_R)
    extrude(amount=-CUT_EXTRUDE12_DEPTH, mode=Mode.SUBTRACT)

    # Sketch27 → Cut-Extrude14 (cut, through all)
    with BuildSketch(Plane.XY.offset(6.35)):
        Circle(SKETCH27_R)
        Circle(SKETCH27_R_2, mode=Mode.SUBTRACT)
    extrude(amount=CUT_EXTRUDE14_DEPTH, mode=Mode.SUBTRACT)


solid = part.part
